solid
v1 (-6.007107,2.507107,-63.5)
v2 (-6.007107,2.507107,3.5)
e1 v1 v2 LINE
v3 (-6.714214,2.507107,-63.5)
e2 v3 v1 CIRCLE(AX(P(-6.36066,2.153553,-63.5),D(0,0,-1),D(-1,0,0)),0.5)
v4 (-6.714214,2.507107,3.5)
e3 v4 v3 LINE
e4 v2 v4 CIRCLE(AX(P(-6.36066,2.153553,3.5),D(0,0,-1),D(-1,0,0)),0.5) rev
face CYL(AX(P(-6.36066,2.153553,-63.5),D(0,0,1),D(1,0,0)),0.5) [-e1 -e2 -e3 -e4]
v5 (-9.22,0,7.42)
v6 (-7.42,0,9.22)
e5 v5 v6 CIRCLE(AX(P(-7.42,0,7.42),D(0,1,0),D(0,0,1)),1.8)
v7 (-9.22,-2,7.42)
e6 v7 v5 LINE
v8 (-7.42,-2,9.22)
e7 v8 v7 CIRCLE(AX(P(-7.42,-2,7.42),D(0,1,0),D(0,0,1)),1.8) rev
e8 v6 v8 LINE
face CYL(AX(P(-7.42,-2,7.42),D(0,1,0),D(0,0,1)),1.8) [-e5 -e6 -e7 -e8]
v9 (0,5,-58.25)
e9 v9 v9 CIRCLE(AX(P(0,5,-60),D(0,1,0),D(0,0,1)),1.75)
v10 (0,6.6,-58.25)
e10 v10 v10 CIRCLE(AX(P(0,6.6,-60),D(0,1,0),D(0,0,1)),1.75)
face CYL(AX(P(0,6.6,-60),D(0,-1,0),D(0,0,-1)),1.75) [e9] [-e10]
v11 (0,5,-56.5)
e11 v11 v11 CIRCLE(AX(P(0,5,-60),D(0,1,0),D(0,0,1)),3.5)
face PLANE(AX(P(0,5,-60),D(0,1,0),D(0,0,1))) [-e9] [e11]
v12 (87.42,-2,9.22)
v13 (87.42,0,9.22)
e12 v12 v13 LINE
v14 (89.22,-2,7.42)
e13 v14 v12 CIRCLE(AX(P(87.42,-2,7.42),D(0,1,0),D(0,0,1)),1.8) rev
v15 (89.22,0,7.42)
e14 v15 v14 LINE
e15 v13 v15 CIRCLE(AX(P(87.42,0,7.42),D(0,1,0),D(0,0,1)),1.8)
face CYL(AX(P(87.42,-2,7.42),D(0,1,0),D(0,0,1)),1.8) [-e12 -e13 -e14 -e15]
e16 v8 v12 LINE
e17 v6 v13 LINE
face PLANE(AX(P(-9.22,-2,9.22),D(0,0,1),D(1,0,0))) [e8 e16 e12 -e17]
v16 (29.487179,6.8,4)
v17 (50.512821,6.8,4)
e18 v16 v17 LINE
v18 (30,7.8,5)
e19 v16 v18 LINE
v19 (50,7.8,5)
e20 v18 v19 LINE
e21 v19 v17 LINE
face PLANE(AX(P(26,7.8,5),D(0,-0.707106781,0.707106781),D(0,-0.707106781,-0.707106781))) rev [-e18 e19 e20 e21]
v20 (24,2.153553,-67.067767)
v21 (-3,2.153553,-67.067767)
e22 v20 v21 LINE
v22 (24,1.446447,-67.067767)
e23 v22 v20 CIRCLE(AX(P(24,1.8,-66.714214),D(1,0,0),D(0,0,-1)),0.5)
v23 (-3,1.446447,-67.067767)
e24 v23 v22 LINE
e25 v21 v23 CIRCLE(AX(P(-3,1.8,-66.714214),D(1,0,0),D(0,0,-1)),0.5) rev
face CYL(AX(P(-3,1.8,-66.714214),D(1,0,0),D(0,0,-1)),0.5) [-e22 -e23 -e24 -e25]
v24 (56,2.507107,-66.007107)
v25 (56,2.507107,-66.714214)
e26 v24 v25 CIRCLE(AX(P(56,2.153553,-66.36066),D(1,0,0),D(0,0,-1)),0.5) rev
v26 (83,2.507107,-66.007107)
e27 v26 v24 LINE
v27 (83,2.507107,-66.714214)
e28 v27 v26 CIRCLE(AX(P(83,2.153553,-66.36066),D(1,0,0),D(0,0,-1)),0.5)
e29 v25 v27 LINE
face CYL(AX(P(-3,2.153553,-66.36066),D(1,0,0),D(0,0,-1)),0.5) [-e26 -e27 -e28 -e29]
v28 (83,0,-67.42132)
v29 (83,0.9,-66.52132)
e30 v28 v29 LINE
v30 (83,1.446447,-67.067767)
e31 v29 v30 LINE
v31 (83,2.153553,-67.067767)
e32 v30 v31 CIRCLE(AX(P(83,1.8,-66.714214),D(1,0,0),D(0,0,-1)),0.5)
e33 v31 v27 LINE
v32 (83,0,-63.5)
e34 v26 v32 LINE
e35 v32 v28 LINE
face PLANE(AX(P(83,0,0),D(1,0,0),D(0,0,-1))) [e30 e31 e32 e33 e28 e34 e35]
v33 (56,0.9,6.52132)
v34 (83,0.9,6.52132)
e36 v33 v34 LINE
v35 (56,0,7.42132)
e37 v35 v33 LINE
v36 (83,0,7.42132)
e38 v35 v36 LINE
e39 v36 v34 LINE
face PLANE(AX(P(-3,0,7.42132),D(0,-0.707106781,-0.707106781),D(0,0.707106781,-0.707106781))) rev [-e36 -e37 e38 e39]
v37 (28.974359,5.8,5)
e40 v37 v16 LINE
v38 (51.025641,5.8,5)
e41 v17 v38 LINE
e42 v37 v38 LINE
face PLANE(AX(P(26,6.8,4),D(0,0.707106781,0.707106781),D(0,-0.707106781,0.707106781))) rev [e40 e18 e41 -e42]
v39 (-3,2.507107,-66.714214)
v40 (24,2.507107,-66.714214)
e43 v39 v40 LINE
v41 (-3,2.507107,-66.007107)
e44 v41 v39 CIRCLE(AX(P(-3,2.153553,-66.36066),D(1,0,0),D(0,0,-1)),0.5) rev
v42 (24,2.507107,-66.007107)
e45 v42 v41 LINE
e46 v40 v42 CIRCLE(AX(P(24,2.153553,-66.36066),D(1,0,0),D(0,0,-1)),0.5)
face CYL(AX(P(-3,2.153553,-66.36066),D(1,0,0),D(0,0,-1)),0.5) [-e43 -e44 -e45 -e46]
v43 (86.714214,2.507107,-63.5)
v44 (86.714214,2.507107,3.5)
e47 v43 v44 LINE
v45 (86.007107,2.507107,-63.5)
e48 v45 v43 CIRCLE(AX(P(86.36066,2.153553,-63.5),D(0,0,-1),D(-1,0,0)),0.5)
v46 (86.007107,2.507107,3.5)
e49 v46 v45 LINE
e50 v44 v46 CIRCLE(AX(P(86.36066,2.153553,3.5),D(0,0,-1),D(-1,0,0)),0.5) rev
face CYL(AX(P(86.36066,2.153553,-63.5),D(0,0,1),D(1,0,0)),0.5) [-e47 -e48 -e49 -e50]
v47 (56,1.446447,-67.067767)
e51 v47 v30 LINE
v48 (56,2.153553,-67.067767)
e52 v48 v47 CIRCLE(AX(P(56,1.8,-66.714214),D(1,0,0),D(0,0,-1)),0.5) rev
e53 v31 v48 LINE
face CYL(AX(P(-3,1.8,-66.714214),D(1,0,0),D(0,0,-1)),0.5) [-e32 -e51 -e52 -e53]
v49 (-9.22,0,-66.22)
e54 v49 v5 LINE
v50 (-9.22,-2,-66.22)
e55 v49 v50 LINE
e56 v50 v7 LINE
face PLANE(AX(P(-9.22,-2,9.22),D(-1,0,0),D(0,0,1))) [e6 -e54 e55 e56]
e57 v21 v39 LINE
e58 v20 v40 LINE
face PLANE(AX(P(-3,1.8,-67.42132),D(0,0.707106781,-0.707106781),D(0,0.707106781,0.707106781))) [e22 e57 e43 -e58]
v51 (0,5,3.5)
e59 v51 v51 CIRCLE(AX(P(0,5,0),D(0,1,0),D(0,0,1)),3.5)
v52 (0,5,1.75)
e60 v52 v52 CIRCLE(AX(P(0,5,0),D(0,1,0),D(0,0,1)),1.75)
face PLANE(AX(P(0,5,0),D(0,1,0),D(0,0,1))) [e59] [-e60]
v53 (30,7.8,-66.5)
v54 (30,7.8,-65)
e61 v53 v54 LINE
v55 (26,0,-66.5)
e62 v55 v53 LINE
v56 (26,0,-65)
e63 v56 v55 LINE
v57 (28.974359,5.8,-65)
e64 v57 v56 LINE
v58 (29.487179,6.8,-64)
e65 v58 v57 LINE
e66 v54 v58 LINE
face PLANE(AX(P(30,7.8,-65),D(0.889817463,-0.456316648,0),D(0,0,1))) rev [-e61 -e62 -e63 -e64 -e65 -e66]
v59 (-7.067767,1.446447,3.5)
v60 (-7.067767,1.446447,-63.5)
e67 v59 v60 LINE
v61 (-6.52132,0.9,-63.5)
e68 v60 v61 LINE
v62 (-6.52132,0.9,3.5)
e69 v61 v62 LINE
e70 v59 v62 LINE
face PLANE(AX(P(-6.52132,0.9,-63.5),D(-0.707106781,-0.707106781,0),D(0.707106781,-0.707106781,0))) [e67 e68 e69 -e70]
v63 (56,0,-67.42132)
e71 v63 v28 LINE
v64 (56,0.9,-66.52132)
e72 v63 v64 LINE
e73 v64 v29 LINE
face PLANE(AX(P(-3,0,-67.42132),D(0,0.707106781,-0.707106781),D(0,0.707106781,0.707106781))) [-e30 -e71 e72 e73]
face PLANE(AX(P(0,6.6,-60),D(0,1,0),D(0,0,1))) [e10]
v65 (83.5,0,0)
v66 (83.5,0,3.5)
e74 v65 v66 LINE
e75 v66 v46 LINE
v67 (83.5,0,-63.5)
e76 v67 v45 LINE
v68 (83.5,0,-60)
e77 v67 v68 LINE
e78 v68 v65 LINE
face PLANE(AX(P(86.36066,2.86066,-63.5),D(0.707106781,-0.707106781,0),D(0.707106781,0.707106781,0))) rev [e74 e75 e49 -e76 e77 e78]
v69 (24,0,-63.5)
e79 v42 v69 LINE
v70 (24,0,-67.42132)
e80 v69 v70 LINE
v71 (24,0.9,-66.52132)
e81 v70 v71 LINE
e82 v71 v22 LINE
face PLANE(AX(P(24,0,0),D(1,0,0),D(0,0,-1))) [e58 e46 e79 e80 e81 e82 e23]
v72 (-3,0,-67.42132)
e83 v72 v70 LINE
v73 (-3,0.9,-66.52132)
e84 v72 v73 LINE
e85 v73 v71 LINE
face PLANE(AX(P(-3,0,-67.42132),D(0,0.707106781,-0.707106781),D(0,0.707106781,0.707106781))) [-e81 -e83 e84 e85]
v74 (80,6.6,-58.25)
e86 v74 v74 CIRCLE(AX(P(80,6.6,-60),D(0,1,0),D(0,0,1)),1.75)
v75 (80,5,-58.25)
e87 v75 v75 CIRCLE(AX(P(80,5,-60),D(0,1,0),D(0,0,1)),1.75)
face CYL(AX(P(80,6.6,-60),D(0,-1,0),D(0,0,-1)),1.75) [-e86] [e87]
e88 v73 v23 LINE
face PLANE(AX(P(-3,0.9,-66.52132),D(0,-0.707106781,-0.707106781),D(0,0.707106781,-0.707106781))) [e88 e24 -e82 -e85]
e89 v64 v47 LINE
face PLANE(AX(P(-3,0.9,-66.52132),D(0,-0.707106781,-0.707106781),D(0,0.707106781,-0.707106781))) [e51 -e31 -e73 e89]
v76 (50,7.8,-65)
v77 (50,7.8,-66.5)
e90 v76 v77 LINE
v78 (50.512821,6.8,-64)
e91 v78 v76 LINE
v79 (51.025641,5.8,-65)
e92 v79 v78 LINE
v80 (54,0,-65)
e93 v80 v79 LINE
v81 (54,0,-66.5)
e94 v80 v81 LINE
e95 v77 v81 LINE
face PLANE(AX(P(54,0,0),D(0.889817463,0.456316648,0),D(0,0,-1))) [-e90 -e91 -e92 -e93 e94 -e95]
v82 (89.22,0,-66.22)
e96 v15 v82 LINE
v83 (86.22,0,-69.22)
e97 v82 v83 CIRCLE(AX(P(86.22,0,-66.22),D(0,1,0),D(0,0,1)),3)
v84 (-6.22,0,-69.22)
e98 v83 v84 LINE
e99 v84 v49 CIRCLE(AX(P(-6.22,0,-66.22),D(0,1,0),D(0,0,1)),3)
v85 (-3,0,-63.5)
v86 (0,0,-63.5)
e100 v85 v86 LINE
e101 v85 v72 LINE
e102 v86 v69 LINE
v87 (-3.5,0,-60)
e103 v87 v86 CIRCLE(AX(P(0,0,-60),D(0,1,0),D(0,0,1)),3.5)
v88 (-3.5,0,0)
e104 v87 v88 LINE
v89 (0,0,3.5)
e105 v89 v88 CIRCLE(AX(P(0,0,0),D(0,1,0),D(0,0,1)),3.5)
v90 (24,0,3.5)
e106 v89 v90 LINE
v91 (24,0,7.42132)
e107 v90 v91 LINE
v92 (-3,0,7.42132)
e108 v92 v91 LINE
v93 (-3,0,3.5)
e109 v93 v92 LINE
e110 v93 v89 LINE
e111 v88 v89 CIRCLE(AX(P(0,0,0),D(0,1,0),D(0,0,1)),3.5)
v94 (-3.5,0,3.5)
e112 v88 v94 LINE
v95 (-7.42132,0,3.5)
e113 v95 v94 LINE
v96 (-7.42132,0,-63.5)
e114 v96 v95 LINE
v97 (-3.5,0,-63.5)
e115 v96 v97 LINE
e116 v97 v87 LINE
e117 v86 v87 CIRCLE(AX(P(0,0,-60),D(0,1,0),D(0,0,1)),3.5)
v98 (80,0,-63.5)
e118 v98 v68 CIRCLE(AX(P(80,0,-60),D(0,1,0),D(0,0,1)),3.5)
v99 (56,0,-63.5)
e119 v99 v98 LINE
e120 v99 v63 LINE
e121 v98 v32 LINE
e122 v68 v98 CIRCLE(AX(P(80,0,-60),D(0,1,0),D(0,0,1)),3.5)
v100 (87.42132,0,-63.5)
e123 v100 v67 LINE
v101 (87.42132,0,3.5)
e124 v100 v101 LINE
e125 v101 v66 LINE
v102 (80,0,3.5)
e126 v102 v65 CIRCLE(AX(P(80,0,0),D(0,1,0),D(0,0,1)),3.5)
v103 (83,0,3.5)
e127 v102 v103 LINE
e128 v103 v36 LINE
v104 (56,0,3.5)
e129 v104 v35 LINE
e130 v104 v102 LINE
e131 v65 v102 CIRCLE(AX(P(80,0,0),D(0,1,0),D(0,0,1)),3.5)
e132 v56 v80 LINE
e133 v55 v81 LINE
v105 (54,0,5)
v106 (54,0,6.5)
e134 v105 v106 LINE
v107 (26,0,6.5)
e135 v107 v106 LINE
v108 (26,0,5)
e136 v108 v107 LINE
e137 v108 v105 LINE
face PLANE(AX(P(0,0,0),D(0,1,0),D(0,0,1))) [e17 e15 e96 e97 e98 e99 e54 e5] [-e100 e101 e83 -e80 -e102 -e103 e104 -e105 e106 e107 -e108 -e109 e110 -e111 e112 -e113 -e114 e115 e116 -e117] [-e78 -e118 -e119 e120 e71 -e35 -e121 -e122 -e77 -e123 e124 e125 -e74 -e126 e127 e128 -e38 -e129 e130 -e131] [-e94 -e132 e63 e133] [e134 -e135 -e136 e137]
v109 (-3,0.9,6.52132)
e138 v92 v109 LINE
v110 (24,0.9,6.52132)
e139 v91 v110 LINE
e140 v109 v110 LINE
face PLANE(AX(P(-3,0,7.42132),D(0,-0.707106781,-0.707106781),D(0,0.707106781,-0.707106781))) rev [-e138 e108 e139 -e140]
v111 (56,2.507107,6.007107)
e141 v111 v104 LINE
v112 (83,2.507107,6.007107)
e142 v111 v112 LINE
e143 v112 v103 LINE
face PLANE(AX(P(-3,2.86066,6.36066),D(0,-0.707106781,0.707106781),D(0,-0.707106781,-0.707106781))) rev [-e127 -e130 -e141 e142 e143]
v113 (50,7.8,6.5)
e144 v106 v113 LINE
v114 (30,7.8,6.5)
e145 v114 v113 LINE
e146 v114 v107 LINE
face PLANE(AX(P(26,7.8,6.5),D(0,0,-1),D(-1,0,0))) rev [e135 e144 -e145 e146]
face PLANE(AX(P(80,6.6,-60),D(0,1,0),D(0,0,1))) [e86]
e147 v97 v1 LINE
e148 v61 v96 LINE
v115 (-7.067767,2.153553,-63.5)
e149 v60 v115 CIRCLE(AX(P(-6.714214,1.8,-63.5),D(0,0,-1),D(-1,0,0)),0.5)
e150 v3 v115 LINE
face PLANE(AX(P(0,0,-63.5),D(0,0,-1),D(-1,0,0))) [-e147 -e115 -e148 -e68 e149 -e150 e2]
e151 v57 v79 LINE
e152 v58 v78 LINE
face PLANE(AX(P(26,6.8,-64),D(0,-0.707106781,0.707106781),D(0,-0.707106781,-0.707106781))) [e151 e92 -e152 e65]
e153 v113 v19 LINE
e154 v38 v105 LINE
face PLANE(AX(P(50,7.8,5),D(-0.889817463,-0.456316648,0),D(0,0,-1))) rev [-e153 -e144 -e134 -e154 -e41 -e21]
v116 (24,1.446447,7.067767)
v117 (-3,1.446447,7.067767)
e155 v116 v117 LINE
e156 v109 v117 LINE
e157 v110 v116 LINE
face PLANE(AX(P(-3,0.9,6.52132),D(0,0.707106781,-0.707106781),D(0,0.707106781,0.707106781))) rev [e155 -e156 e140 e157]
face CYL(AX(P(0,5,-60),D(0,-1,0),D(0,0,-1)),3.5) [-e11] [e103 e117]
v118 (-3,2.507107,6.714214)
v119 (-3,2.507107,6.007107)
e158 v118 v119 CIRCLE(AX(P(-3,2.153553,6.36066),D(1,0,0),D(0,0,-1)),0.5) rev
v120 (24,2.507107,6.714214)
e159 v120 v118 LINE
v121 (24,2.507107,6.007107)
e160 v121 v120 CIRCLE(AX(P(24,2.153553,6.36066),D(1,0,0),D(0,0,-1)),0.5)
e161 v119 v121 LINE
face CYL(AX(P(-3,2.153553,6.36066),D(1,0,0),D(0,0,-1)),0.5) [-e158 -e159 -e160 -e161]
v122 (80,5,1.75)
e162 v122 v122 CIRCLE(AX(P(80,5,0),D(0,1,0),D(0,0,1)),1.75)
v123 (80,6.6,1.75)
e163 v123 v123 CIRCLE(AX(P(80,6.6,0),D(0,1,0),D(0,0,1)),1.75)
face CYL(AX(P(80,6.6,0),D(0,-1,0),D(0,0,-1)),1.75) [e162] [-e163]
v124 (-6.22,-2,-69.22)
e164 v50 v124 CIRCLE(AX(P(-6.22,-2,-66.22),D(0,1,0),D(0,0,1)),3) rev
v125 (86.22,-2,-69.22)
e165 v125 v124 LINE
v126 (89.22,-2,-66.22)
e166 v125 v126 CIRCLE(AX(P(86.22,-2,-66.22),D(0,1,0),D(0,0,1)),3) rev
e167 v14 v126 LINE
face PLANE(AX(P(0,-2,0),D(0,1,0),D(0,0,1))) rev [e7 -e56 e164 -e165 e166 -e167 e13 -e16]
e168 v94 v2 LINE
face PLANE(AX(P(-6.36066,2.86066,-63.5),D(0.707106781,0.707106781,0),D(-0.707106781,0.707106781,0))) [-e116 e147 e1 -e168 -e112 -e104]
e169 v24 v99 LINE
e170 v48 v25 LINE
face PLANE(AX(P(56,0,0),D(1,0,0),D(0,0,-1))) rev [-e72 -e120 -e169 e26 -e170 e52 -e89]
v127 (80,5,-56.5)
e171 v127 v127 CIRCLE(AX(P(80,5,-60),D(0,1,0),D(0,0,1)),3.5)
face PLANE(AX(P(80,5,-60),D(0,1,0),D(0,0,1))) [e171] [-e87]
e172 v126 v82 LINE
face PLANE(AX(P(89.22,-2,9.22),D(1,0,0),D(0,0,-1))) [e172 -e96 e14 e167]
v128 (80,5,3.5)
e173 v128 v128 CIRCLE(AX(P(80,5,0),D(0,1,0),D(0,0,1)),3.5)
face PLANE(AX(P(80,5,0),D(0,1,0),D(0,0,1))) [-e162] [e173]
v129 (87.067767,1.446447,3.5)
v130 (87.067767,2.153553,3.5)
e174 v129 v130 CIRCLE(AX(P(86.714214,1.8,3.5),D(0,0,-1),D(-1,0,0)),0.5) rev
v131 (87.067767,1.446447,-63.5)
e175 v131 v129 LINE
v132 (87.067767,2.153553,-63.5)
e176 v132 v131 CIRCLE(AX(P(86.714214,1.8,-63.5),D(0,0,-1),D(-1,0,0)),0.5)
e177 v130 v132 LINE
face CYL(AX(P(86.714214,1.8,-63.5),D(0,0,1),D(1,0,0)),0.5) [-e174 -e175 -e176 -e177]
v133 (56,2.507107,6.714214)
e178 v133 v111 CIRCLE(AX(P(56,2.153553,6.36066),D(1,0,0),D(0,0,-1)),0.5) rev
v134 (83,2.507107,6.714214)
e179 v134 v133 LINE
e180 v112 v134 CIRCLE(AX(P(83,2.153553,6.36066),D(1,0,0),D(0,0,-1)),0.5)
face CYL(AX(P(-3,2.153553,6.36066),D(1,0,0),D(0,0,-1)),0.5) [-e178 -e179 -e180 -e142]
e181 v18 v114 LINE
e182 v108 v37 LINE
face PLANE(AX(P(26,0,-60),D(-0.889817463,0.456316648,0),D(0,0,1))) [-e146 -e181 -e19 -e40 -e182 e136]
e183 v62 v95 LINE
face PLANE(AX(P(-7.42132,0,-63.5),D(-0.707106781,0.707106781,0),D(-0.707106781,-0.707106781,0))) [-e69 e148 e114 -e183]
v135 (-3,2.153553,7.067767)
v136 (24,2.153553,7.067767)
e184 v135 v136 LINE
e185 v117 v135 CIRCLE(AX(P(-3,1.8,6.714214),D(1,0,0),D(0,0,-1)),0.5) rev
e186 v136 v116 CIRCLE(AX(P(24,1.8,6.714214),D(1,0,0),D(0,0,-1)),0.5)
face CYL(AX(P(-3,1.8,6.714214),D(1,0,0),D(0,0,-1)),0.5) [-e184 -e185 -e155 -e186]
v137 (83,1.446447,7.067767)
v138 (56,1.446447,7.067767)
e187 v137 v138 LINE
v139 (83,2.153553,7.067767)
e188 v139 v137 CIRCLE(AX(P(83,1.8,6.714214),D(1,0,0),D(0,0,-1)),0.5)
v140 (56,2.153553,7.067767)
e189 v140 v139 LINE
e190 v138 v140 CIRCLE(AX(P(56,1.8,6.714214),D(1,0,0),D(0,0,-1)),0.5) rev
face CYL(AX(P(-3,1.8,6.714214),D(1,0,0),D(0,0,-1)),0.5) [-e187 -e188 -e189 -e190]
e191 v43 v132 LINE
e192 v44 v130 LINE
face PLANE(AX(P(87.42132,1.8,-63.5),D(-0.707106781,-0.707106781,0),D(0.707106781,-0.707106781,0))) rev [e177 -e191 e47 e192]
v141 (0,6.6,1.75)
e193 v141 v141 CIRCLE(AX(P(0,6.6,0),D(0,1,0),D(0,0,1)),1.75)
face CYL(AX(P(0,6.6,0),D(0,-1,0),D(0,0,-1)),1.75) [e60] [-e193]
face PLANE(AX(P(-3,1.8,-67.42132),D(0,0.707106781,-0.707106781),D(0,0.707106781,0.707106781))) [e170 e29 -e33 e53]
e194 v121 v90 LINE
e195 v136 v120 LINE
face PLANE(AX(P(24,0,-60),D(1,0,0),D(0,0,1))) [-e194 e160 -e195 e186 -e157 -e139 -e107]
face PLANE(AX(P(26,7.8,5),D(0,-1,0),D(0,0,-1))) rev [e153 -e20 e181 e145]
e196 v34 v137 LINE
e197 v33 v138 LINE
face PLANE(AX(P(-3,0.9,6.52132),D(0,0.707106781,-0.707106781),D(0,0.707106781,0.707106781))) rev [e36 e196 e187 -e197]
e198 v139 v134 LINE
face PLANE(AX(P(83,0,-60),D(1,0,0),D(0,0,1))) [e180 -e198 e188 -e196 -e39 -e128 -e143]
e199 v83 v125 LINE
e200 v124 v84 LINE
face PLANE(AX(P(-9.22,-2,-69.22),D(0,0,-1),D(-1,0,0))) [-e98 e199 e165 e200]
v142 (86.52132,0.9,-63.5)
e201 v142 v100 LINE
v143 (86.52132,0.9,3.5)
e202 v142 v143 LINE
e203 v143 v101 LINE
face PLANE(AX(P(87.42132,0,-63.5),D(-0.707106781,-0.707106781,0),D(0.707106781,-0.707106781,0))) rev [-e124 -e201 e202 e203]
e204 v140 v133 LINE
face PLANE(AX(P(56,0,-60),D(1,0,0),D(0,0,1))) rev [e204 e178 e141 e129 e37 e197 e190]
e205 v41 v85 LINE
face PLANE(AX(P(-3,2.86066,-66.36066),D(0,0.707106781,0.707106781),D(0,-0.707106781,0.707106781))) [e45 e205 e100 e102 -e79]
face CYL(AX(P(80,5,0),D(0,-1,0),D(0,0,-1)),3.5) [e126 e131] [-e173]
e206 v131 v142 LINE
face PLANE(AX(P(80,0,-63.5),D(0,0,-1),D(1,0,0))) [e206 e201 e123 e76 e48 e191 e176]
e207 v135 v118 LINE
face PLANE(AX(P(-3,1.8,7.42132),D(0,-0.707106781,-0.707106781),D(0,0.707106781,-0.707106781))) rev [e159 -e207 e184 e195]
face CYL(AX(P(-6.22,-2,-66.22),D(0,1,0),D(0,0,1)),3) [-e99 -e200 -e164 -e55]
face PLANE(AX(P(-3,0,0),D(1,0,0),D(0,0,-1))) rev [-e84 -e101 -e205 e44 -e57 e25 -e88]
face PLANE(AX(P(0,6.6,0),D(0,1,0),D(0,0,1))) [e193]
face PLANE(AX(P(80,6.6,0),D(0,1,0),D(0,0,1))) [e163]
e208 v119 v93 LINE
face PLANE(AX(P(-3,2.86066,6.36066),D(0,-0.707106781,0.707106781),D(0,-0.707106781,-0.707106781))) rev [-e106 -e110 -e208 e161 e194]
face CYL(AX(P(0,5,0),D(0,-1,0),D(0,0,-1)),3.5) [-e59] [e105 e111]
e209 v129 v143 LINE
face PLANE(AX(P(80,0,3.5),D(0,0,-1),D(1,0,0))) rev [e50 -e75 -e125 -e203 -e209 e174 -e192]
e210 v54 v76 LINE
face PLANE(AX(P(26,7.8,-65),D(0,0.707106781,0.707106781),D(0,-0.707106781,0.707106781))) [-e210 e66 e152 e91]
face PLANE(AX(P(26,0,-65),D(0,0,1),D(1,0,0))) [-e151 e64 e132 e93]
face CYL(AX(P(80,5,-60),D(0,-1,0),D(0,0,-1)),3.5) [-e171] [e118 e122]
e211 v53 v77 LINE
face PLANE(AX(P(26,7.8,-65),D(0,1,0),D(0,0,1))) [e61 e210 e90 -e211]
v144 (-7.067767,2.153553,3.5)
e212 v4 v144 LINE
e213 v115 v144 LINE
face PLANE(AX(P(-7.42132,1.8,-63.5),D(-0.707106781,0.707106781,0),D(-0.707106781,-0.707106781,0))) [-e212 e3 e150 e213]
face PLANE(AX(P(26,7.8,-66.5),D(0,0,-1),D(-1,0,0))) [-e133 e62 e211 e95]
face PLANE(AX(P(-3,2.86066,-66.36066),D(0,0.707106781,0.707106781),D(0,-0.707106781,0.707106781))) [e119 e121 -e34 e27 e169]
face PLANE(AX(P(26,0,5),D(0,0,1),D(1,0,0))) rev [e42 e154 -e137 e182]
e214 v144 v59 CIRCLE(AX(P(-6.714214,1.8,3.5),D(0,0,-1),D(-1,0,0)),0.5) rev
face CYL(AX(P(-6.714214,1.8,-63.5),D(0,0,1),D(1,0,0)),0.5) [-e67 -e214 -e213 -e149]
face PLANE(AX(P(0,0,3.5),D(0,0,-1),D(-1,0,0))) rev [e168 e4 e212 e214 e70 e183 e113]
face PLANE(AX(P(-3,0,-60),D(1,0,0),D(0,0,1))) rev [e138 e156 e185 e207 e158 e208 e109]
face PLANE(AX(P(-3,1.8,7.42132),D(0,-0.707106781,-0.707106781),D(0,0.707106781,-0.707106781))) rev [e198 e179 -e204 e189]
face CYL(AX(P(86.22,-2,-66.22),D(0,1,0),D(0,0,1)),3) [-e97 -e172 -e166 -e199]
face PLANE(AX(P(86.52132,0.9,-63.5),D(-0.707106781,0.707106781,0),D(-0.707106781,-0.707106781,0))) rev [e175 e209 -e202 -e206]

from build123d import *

# Parameters (mm, degrees)
SKETCH2_R            = 3.5
BOSS_EXTRUDE1_DEPTH  = 5
SKETCH3_R            = 1.75
BOSS_EXTRUDE2_DEPTH  = 1.6
SKETCH1_W            = 98.44
SKETCH1_H            = 78.44
BOSS_EXTRUDE4_DEPTH  = 2
BOSS_EXTRUDE5_START  = -63.5
BOSS_EXTRUDE5_DEPTH  = 67
FILLET1_R            = 0.5
FILLET1_OF_MIRROR1_R = 0.5
BOSS_EXTRUDE8_DEPTH  = 43
CUT_EXTRUDE4_DEPTH   = 16
BOSS_EXTRUDE9_DEPTH  = 14
CHAMFER3_START       = -66.5
CHAMFER3_DEPTH       = 2.5
CHAMFER4_SIZE2       = 4
CHAMFER4_SIZE        = 7.8
FILLET2_R            = 0.5
FILLET2_OF_MIRROR2_R = 0.5
FILLET3_R            = 3
CHAMFER5_SIZE2       = 4
CHAMFER5_SIZE        = 7.8
CHAMFER6_SIZE2       = 7.8
CHAMFER6_SIZE        = 4
FILLET4_R            = 1.8


with BuildPart() as part:
    # Sketch2 → Boss-Extrude1 (new body)
    with BuildSketch(Plane(origin=(0, 0, 0), x_dir=(1, 0, 0), z_dir=(0, 1, 0))):
        with Locations(Location((0, 0, 0), (0, 0, 270))):
            Circle(SKETCH2_R)
    boss_extrude1 = extrude(amount=BOSS_EXTRUDE1_DEPTH)

    # Sketch3 → Boss-Extrude2 (add)
    with BuildSketch(Plane(origin=(0, 5, 0), x_dir=(1, 0, 0), z_dir=(0, 1, 0))):
        with Locations(Location((0, 0, 0), (0, 0, 270))):
            Circle(SKETCH3_R)
    boss_extrude2 = extrude(amount=BOSS_EXTRUDE2_DEPTH)

    # Sketch1 → Boss-Extrude4 (add)
    with BuildSketch(Plane(origin=(0, 0, 0), x_dir=(1, 0, 0), z_dir=(0, 1, 0))):
        with Locations((40, 30)):
            Rectangle(SKETCH1_W, SKETCH1_H)
    extrude(amount=-BOSS_EXTRUDE4_DEPTH)

    # Sketch-Pattern2: Boss-Extrude1, Boss-Extrude2 at 3 more places
    with Locations((80, 0, 0), (80, 0, -60), (0, 0, -60)):
        add(boss_extrude1)
        add(boss_extrude2)

    # Sketch6 → Boss-Extrude5 (add)
    with BuildSketch(Plane.XY.offset(BOSS_EXTRUDE5_START)):
        Polygon((-7.421320344, 1.8), (-6.360660172, 2.860660172), (-3.5, 0), (-7.421320344, 0), (-6.521320344, 0.9), align=None)
    boss_extrude5 = extrude(amount=BOSS_EXTRUDE5_DEPTH)

    # Fillet1
    fillet1_edges = [part.edges().sort_by_distance(p)[0] for p in [
        (-7.421320344, 1.8, -30),
        (-6.360660172, 2.860660172, -30),
    ]]
    fillet(fillet1_edges, radius=FILLET1_R)

    # Mirror1: Boss-Extrude5 across plane
    add(boss_extrude5.mirror(Plane(origin=(40, 0, 0), x_dir=(0, 0, 1), z_dir=(1, 0, 0))))

    # Fillet1 of Mirror1
    fillet1_of_mirror1_edges = [part.edges().sort_by_distance(p)[0] for p in [
        (87.421320344, 1.8, -30),
        (86.360660172, 2.860660172, -30),
    ]]
    fillet(fillet1_of_mirror1_edges, radius=FILLET1_OF_MIRROR1_R)

    # Sketch8 → Boss-Extrude8 (add, symmetric)
    with BuildSketch(Plane(origin=(40, 0, 0), x_dir=(0, 0, -1), z_dir=(1, 0, 0))):
        Polygon((66.360660172, 2.860660172), (63.5, 0), (67.421320344, 0), (66.521320344, 0.9), (67.421320344, 1.8), align=None)
    boss_extrude8 = extrude(amount=BOSS_EXTRUDE8_DEPTH, both=True)

    # Sketch8<4> → Cut-Extrude4 (cut, symmetric)
    with BuildSketch(Plane(origin=(40, 0, 0), x_dir=(0, 0, -1), z_dir=(1, 0, 0))):
        Polygon((66.360660172, 2.860660172), (63.5, 0), (67.421320344, 0), (66.521320344, 0.9), (67.421320344, 1.8), align=None)
    cut_extrude4 = extrude(amount=CUT_EXTRUDE4_DEPTH, both=True, mode=Mode.SUBTRACT)

    # Sketch7 → Boss-Extrude9 (add, symmetric)
    with BuildSketch(Plane(origin=(40, 0, 0), x_dir=(0, 0, -1), z_dir=(1, 0, 0))):
        Polygon((66.5, 7.8), (66.5, 0), (65, 0), (65, 5.8), (64, 6.8), (65, 7.8), align=None)
    boss_extrude9 = extrude(amount=BOSS_EXTRUDE9_DEPTH, both=True)

    # Chamfer3: read off the stored shape, not the designer's step
    # Chamfer3 outline → Chamfer3 (cut)
    with BuildSketch(Plane.XY.offset(CHAMFER3_START)):
        Polygon((26, 7.8), (26, 0), (30, 7.8), align=None)
    extrude(amount=CHAMFER3_DEPTH, mode=Mode.SUBTRACT)

    # Chamfer4
    chamfer4_edges = [part.edges().sort_by_distance(p)[0] for p in [
        (54, 7.8, -65.75),
    ]]
    chamfer4_side = [part.faces().sort_by_distance(p)[0] for p in [
        (54, 7.72, -65.75),
    ]]
    chamfer(chamfer4_edges, length=CHAMFER4_SIZE - 0.0001, length2=CHAMFER4_SIZE2 - 0.0001, reference=chamfer4_side[0])  # a hair under: the kernel refuses the full size

    # Fillet2
    fillet2_edges = [part.edges().sort_by_distance(p)[0] for p in [
        (10.5, 2.860660172, -66.360660172),
        (10.5, 1.8, -67.421320344),
        (69.5, 2.860660172, -66.360660172),
        (69.5, 1.8, -67.421320344),
    ]]
    fillet(fillet2_edges, radius=FILLET2_R)

    # Mirror2: Boss-Extrude8, Cut-Extrude4 across plane
    add(boss_extrude8.mirror(Plane.XY.offset(-30)))
    add(cut_extrude4.mirror(Plane.XY.offset(-30)), mode=Mode.SUBTRACT)

    # Fillet2 of Mirror2
    fillet2_of_mirror2_edges = [part.edges().sort_by_distance(p)[0] for p in [
        (10.5, 2.860660172, 6.360660172),
        (10.5, 1.8, 7.421320344),
        (69.5, 2.860660172, 6.360660172),
        (69.5, 1.8, 7.421320344),
    ]]
    fillet(fillet2_of_mirror2_edges, radius=FILLET2_OF_MIRROR2_R)

    # Fillet3
    fillet3_edges = [part.edges().sort_by_distance(p)[0] for p in [
        (-9.22, -1, -69.22),
        (89.22, -1, -69.22),
    ]]
    fillet(fillet3_edges, radius=FILLET3_R)

    # Mirror4: Boss-Extrude9 across plane
    add(boss_extrude9.mirror(Plane.XY.offset(-30)))

    # Chamfer5
    chamfer5_edges = [part.edges().sort_by_distance(p)[0] for p in [
        (26, 7.8, 5.75),
    ]]
    chamfer5_side = [part.faces().sort_by_distance(p)[0] for p in [
        (26, 7.72, 5.75),
    ]]
    chamfer(chamfer5_edges, length=CHAMFER5_SIZE - 0.0001, length2=CHAMFER5_SIZE2 - 0.0001, reference=chamfer5_side[0])  # a hair under: the kernel refuses the full size

    # Chamfer6
    chamfer6_edges = [part.edges().sort_by_distance(p)[0] for p in [
        (54, 7.8, 5.75),
    ]]
    chamfer6_side = [part.faces().sort_by_distance(p)[0] for p in [
        (53.92, 7.8, 5.75),
    ]]
    chamfer(chamfer6_edges, length=CHAMFER6_SIZE - 0.0001, length2=CHAMFER6_SIZE2 - 0.0001, reference=chamfer6_side[0])  # a hair under: the kernel refuses the full size

    # Fillet4
    fillet4_edges = [part.edges().sort_by_distance(p)[0] for p in [
        (89.22, -1, 9.22),
        (-9.22, -1, 9.22),
    ]]
    fillet(fillet4_edges, radius=FILLET4_R)


solid = part.part
